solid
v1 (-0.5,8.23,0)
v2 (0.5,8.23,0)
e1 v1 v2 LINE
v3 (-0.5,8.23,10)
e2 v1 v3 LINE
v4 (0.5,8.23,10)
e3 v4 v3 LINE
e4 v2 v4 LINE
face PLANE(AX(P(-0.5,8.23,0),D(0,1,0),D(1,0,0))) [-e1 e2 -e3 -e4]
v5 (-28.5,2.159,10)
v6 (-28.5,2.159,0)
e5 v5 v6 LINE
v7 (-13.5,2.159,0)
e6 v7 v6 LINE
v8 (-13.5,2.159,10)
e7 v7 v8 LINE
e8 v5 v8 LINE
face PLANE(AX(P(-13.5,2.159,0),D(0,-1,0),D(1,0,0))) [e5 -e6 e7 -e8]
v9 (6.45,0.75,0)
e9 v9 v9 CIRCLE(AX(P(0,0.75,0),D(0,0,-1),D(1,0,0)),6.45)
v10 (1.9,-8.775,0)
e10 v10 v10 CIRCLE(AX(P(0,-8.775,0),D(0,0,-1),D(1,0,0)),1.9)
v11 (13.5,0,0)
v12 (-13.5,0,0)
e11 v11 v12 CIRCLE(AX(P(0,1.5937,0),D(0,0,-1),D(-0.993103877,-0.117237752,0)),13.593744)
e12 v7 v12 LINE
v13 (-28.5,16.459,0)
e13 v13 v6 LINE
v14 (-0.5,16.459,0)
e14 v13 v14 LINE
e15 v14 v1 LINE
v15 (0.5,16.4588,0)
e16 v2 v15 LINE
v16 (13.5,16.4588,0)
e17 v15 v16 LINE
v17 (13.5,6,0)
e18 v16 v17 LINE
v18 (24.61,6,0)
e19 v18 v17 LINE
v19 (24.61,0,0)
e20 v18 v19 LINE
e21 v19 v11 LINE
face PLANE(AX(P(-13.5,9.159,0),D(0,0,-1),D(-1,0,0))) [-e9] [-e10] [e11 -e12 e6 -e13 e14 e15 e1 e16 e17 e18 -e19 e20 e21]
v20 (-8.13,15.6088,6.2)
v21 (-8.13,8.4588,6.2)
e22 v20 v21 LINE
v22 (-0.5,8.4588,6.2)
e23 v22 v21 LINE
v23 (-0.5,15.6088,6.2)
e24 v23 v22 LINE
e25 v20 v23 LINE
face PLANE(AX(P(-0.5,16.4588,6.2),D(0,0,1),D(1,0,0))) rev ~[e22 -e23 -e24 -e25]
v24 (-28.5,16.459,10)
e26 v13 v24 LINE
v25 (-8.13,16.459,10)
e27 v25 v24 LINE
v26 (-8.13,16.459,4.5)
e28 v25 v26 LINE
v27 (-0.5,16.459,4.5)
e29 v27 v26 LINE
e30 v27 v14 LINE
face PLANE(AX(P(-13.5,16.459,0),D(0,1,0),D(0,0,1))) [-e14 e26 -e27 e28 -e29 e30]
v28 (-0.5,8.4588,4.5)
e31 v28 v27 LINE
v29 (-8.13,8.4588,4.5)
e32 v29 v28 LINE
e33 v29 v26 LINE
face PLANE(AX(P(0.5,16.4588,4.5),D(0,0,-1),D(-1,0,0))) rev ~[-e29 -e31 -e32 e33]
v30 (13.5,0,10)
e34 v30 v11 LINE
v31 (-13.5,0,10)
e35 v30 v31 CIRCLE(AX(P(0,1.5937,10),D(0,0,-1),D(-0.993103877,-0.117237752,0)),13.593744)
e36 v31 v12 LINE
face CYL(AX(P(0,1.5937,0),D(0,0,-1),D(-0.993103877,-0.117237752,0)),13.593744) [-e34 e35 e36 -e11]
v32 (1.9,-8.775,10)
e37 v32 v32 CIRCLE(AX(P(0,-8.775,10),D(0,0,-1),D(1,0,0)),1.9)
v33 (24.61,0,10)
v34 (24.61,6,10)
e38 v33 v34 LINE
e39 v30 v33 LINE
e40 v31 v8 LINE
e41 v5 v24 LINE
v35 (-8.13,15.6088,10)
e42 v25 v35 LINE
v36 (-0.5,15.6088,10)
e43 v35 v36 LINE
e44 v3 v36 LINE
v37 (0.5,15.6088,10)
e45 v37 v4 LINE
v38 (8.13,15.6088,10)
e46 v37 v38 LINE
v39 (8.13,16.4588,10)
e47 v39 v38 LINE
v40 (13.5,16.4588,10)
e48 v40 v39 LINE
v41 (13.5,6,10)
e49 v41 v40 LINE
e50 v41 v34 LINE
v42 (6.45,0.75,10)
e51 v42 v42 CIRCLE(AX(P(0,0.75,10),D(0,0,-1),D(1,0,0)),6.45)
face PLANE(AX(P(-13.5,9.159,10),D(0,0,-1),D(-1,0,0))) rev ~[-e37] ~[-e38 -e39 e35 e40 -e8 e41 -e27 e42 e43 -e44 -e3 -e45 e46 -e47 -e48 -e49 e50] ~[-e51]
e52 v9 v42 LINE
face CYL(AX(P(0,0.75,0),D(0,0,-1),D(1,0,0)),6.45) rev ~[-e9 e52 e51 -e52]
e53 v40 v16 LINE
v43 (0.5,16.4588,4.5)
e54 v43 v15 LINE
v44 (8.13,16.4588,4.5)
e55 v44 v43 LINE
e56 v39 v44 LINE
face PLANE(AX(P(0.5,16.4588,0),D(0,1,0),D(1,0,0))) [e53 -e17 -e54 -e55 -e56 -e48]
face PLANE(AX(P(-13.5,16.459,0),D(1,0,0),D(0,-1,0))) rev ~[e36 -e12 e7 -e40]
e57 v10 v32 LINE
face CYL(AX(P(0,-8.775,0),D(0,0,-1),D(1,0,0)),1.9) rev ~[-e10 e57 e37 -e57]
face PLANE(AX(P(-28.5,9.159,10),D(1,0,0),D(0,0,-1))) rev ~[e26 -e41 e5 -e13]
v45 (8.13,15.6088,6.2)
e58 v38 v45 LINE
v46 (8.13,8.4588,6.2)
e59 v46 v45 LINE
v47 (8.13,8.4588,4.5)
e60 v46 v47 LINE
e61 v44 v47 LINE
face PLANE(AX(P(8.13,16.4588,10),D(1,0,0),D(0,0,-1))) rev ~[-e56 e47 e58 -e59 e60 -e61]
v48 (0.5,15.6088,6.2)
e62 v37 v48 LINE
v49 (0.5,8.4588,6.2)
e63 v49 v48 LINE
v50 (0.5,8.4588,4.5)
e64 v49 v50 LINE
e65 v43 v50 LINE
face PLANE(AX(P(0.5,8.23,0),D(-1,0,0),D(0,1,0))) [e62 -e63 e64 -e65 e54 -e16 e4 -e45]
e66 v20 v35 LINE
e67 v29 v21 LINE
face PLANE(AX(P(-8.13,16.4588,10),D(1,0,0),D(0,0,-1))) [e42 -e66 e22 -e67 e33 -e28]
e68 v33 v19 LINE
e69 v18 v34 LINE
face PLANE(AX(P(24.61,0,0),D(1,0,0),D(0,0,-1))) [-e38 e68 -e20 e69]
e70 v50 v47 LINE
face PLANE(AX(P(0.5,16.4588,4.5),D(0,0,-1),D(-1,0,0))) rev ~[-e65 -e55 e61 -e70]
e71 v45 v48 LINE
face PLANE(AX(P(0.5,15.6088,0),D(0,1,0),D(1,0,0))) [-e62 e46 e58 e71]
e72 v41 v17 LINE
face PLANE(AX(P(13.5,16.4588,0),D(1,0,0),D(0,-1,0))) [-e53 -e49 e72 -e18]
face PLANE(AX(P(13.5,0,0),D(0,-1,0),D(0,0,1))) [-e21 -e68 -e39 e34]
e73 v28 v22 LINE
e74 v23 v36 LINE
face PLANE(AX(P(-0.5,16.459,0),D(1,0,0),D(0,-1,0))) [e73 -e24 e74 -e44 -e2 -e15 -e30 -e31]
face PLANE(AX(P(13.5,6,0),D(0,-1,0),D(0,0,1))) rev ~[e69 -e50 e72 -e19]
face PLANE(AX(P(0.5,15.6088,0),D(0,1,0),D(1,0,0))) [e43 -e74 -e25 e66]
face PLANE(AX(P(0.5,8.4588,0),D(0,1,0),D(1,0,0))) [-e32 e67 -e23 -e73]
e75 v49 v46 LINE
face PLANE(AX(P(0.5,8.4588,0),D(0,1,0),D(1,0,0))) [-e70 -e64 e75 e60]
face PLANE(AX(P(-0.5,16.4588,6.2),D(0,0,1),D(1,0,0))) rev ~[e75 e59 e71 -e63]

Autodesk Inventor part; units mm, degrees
ref_plane "YZ Plane" through (0, 0, 0) normal (1, 0, 0) x (0, 1, 0)
ref_plane "XZ Plane" through (0, 0, 0) normal (0, 1, 0) x (-1, 0, 0)
ref_plane "XY Plane" through (0, 0, 0) normal (0, 0, 1) x (1, 0, 0)
sketch "Sketch1" plane through (0, 0, 0) normal (0, 0, 1) x (1, 0, 0)
  circle A0 centre (0, 0.75) radius 6.45
  circle A1 centre (0, -8.775) radius 1.9
  line L0 (-18.9, 0) -> (18.9, 0) construction
  line L1 (0, -17.6918) -> (0, 22.1508) construction
  line L2 (-0.5, 16.459) -> (-0.5, 8.23)
  line L3 (-0.5, 8.23) -> (0.5, 8.23)
  line L4 (0.5, 8.23) -> (0.5, 16.4588)
  line L5 (-12.7, 16.459) -> (-0.5, 16.459)
  line L6 (0.5, 16.4588) -> (12.7, 16.4588)
  line L7 (-12.7, 16.459) -> (-13.5, 16.459)
  line L8 (12.7, 16.4588) -> (13.5, 16.4588)
  line L9 (13.5, 16.4588) -> (13.5, 0)
  line L10 (-13.5, 16.459) -> (-13.5, 0)
  arc A2 (-13.5, 0) -> (13.5, 0) centre (0, 1.5937) ccw
  dimension "d0" = 12.9
  dimension "d1" = 3.8
  dimension "d11" = 1
  dimension "d33" = 0.8
  dimension "d34" = 0.8
  dimension "d35" = 27
  dimension "d36" = 13
  dimension "d37" = 13.5
  dimension "d40" = 15.709
  dimension "d44" = 13.5938
  dimension "d45" = 9.525
  dimension "d47" = 15.7088
  dimension "d54" = 7.48
  dimension "d55" = 6.6363
extrude "Extrusion1" add sketch "Sketch1" along normal blind 10
sketch "Sketch2" plane through (0.5, 16.4588, 0) normal (0, 1, 0) x (1, 0, 0)
  line L0 (0, 0) -> (0, -10) projected
  line L1 (0, -10) -> (7.63, -10)
  line L2 (7.63, -10) -> (7.63, -6.2)
  line L3 (7.63, -6.2) -> (0, -6.2)
  line L4 (0, -6.2) -> (0, -10)
  line L5 (-1, -10) -> (-14, -10) projected
  line L6 (-1, -10) -> (-8.63, -10)
  line L7 (-8.63, -10) -> (-8.63, -6.2)
  line L8 (-8.63, -6.2) -> (-1, -6.2)
  line L9 (-1, -6.2) -> (-1, -10)
  line L10 (-8.63, -6.2) -> (7.63, -6.2)
  line L11 (7.63, -6.2) -> (7.63, -4.5)
  line L12 (7.63, -4.5) -> (-8.63, -4.5)
  line L13 (-8.63, -4.5) -> (-8.63, -6.2)
  point P0 (-0.5, 0)
  point P1 (-13.2, -10)
  point P2 (7.63, -6.2)
  point P3 (-8.63, -10)
  dimension "d18" = 7.63
  dimension "d19" = 3.8
  dimension "d20" = 7.63
  dimension "d21" = 3.8
  dimension "d22" = 1.7
extrude "Extrusion2" cut sketch "Sketch2" against normal blind 8 contours L10 L8 L13 L12 L0 | L0 L12 L11 L3
extrude "Extrusion3" cut sketch "Sketch2" against normal blind 0.85 contours L3 L2 L1 L0 | L9 L5 L7 L8
sketch "Sketch4" plane through (13.5, 0, 0) normal (1, 0, 0) x (0, 0, -1)
  line L0 (0, 0) -> (-10, 0) projected
  line L1 (0, 0) -> (0, 16.4588) projected
  line L2 (-10, 0) -> (0, 0)
  line L3 (0, 0) -> (0, 6)
  line L4 (0, 6) -> (-10, 6)
  line L5 (-10, 6) -> (-10, 0)
  dimension "d56" = 6
extrude "Extrusion5" add sketch "Sketch4" along normal blind 11.11
sketch "Sketch5" plane through (-13.5, 16.459, 0) normal (0, 1, 0) x (1, 0, 0)
  point P0 (13.5, 0)
sketch "Sketch6" plane through (-13.5, 16.459, 0) normal (0, 1, 0) x (1, 0, 0)
  line L0 (5.37, -6.2) -> (5.37, -4.5) projected
  line L1 (13, 0) -> (13, -10) projected
  line L2 (5.37, -6.2) -> (13, -6.2)
  line L3 (13, -6.2) -> (13, -10)
  line L4 (13, -10) -> (5.37, -10)
  line L5 (5.37, -10) -> (5.37, -6.2)
  line L6 (5.37, -4.5) -> (13, -4.5) projected
  line L7 (5.37, -6.2) -> (13, -6.2)
  line L8 (13, -6.2) -> (13, -4.5)
  line L9 (13, -4.5) -> (5.37, -4.5)
  line L10 (5.37, -4.5) -> (5.37, -6.2)
  point P0 (13.5, 0)
extrude "Extrusion6" cut sketch "Sketch6" against normal up to surface (0.8502 mm away) contours L2 L1 L4 L5
extrude "Extrusion7" cut sketch "Sketch6" against normal blind 8 contours L0 L6 L1 L2
sketch "Sketch7" plane through (-13.5, 0, 0) normal (-1, 0, 0) x (0, 0, 1)
  line L0 (0, 16.459) -> (10, 16.459) projected
  line L1 (10, 16.459) -> (10, 0) projected
  line L2 (0, 16.459) -> (10, 16.459)
  line L3 (10, 16.459) -> (10, 9.159)
  line L4 (10, 9.159) -> (0, 9.159)
  line L5 (0, 9.159) -> (0, 16.459)
  point P0 (0, 0)
  dimension "d63" = 7.3
extrude "Extrusion8" add sketch "Sketch7" along normal blind 14
sketch "Sketch8" plane through (-13.5, 9.159, 0) normal (0, -1, 0) x (1, 0, 0)
  line L0 (13, 0) -> (-14, 0) projected
  line L1 (27, 10) -> (0, 10) projected
  line L2 (-14, 0) -> (0, 0)
  line L3 (0, 0) -> (0, 10)
  line L4 (0, 10) -> (-14, 10)
  line L5 (-14, 10) -> (-14, 0)
  point P0 (13.5, 0)
extrude "Extrusion9" add sketch "Sketch8" along normal blind 7
move faces "Move1" translate (-1, 0, 0) faces at (-27.5, 11.6923, 6.6667)
properties part number "Prowadnica_tloka" material "PC/ABS Plastic"
